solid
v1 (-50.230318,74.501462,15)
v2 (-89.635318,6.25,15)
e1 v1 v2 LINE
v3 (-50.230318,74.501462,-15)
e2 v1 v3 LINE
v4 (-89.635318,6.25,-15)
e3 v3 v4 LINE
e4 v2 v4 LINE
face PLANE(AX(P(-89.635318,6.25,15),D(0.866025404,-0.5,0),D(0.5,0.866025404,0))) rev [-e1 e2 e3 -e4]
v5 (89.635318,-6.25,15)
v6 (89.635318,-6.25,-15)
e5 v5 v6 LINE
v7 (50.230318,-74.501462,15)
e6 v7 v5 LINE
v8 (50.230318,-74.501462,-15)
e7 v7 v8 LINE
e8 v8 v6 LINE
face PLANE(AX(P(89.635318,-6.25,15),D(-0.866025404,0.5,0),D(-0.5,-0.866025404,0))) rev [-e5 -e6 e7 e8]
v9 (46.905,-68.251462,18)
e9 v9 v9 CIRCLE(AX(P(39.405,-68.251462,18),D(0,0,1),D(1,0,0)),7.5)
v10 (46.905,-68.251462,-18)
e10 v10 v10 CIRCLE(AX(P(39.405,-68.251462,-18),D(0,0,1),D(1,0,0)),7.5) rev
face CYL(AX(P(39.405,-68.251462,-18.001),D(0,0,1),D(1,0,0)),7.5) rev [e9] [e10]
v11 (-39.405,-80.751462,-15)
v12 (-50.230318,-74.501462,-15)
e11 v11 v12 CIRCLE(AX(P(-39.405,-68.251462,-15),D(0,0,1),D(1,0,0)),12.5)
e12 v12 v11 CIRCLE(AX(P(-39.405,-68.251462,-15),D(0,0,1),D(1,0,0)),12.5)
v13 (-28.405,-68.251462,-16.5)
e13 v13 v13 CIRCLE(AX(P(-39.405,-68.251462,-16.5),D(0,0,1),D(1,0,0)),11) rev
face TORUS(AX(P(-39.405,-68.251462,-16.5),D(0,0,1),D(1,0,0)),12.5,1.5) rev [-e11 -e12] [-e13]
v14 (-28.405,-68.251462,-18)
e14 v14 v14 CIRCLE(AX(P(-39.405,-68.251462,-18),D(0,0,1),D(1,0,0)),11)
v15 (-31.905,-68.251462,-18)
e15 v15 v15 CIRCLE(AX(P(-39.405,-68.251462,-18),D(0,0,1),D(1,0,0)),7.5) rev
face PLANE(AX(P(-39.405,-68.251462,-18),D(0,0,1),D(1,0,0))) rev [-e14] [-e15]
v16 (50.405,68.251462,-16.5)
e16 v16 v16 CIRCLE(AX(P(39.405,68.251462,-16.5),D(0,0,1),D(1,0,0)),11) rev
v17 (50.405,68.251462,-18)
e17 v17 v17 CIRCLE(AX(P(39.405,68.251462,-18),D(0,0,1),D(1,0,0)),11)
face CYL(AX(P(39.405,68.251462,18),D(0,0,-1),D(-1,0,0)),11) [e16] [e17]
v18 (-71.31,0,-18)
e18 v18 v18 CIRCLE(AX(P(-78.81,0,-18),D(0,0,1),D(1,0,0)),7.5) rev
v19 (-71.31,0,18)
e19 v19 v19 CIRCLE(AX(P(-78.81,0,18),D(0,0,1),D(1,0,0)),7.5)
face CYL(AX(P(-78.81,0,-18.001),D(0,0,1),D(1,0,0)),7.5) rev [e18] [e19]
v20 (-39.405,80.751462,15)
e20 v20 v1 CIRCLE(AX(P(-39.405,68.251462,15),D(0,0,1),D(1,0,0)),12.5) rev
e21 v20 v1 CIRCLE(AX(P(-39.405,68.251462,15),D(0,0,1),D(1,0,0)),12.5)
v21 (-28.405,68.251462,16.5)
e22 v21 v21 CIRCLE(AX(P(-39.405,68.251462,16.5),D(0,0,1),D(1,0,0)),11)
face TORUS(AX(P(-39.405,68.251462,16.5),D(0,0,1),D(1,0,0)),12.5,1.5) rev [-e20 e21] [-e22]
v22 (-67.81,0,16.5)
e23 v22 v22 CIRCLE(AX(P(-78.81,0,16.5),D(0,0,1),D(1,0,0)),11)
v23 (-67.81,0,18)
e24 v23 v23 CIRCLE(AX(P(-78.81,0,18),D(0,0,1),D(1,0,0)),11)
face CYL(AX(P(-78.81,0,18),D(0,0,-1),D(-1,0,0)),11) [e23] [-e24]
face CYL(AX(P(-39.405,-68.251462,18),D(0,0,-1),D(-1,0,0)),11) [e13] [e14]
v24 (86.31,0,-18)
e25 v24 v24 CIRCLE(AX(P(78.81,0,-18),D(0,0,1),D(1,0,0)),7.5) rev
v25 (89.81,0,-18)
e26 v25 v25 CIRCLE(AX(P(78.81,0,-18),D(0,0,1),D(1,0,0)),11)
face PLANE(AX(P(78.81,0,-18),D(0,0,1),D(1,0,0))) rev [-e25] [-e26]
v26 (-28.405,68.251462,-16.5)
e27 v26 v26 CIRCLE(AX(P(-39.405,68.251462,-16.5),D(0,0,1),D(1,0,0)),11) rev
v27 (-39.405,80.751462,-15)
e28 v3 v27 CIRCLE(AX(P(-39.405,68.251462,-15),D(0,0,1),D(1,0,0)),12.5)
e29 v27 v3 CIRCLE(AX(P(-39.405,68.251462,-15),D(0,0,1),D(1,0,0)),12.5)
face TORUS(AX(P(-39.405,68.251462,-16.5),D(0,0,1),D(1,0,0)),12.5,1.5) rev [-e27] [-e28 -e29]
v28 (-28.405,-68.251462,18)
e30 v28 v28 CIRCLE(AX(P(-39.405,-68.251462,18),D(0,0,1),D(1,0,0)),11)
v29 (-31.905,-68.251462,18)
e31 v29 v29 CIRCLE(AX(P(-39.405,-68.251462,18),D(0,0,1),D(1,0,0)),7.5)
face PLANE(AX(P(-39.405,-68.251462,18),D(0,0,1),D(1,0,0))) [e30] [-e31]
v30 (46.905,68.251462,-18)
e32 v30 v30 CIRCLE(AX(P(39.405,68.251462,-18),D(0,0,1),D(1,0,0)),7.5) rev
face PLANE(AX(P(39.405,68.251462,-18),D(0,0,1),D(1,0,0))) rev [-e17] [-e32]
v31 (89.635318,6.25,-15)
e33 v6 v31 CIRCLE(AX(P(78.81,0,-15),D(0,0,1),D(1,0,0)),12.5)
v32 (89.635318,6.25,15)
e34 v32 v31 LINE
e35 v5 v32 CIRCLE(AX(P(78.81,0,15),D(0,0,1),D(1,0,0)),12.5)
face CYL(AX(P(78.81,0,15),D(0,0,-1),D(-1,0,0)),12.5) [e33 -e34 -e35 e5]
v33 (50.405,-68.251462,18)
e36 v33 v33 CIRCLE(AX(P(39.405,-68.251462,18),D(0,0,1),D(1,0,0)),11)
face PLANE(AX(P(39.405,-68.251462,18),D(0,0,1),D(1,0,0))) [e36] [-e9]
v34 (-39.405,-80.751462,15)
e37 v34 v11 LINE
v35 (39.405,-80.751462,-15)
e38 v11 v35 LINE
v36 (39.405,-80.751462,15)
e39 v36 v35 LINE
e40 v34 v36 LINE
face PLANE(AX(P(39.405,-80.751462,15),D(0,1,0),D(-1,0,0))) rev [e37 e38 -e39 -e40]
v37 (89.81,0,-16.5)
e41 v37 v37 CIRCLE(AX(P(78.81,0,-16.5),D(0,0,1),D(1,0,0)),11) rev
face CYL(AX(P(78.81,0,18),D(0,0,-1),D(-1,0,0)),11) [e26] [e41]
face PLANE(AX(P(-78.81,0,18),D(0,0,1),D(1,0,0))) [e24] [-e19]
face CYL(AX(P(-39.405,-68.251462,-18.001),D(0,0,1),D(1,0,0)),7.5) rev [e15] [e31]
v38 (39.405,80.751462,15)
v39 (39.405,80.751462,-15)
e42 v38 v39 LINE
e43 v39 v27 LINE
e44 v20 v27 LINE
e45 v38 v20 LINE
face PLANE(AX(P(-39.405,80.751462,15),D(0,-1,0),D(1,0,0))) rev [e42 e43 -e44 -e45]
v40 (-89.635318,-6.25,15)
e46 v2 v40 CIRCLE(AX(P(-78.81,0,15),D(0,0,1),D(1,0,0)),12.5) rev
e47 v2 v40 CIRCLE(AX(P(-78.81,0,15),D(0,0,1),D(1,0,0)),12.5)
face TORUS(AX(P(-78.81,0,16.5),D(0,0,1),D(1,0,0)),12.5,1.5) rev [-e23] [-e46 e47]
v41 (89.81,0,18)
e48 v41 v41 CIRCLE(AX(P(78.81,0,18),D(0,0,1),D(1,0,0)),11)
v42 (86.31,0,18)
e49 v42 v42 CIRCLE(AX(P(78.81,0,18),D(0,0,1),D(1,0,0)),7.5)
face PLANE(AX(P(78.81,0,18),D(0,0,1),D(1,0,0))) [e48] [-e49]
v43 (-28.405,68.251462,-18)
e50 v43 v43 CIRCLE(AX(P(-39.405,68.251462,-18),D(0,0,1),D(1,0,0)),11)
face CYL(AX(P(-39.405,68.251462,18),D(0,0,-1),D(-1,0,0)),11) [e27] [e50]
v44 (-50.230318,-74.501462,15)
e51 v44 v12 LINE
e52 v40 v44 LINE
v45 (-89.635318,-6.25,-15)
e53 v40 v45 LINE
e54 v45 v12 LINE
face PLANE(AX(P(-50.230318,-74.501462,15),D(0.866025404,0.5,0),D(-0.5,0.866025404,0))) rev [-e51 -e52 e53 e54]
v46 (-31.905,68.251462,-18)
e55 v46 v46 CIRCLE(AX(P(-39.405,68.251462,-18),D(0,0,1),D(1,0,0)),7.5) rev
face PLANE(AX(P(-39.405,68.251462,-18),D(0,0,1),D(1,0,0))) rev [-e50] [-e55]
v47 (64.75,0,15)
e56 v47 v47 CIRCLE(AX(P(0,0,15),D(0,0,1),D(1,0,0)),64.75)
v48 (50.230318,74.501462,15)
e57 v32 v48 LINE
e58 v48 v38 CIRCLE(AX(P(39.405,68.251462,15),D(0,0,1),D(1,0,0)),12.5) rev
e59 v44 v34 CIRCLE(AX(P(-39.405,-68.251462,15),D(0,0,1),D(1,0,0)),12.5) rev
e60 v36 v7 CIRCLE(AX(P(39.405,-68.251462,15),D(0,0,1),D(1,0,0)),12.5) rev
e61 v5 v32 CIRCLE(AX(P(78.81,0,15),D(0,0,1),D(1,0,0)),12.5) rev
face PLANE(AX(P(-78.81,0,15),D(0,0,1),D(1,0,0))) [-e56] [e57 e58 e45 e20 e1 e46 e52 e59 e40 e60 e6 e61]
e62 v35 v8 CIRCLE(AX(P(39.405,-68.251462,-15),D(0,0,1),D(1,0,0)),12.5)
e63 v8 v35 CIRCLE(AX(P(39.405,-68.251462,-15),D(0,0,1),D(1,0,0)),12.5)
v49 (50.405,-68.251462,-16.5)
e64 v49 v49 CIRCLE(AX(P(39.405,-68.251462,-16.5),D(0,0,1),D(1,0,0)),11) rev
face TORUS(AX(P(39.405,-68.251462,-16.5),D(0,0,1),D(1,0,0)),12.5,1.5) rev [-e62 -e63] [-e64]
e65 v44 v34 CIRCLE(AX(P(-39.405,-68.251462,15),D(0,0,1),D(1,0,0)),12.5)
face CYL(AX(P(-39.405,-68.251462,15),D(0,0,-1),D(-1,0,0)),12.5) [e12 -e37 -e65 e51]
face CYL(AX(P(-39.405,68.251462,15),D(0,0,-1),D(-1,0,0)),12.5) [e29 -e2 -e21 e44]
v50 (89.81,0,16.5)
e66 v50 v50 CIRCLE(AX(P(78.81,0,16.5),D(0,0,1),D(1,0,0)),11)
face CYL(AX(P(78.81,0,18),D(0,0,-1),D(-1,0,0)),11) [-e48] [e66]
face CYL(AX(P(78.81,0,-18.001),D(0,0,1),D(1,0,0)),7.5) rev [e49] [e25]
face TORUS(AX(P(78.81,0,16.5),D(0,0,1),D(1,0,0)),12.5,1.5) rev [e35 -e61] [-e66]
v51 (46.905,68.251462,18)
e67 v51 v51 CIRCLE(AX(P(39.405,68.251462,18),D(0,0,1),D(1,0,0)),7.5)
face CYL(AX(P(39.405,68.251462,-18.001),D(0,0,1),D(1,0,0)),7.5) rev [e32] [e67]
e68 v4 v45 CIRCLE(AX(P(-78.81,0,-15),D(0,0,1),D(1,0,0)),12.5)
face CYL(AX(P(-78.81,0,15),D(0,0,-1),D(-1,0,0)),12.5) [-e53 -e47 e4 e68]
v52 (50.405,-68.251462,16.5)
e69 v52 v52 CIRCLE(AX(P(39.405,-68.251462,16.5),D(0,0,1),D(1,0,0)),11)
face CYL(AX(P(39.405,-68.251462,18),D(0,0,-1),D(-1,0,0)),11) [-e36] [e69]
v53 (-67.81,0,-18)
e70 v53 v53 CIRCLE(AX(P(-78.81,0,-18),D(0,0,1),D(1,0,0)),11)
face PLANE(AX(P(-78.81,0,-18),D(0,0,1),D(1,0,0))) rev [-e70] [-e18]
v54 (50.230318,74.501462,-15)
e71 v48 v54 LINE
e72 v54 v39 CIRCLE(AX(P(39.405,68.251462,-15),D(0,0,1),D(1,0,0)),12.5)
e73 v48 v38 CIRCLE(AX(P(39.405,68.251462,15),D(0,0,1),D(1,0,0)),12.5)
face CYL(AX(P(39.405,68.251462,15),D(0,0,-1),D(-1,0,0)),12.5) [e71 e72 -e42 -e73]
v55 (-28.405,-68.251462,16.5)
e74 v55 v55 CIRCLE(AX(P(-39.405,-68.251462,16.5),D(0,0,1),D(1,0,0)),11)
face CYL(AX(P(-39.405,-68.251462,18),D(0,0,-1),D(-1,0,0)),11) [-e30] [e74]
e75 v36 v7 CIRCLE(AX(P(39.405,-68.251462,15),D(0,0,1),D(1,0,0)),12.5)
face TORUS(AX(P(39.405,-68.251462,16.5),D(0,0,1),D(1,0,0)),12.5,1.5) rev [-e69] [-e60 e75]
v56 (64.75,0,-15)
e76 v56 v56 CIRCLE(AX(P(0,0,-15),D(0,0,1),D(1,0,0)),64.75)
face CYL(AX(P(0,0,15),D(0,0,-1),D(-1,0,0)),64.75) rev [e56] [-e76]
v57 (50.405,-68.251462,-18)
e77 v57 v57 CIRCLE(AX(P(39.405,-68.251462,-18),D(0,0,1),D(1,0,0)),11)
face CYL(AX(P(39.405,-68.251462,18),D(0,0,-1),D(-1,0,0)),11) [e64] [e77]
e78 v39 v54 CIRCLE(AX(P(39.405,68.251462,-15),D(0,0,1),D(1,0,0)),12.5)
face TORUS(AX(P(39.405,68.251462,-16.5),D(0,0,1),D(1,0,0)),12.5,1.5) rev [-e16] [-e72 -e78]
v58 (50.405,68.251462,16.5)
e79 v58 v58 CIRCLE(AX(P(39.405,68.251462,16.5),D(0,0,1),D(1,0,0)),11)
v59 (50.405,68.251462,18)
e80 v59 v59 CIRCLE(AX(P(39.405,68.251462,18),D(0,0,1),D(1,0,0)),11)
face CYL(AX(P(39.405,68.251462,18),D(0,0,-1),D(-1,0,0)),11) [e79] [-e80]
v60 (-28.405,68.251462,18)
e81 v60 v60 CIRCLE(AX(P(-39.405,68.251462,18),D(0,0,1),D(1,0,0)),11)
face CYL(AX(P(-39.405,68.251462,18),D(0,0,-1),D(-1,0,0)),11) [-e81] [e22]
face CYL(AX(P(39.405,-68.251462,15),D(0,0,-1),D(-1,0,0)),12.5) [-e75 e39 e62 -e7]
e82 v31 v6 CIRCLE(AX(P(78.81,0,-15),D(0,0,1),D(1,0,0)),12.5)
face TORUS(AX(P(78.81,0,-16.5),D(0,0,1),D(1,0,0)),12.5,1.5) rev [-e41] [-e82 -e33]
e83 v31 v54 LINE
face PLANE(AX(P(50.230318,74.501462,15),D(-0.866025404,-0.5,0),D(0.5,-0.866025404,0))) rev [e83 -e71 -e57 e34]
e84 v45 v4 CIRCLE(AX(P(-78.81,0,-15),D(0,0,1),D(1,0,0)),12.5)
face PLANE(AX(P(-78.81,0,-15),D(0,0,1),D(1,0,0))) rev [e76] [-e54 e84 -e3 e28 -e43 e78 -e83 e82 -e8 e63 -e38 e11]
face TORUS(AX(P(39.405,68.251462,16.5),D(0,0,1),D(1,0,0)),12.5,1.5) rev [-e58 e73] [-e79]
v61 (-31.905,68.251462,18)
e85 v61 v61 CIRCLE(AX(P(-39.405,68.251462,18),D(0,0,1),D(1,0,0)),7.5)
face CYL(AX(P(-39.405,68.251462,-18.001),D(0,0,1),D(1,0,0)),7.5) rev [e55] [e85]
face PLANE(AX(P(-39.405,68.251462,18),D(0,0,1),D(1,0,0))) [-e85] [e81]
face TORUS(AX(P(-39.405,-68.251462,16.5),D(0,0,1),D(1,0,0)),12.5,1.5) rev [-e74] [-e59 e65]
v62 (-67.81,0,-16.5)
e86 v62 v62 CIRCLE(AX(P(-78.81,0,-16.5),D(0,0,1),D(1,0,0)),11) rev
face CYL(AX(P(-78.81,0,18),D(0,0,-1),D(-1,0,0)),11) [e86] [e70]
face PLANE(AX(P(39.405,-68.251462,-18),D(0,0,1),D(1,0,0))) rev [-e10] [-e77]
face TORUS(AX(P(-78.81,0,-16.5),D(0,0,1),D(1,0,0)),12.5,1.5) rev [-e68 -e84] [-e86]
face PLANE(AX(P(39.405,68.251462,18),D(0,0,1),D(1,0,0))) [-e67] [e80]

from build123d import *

# Parameters (mm, degrees)
SKETCH1_R           = 64.75
BOSS_EXTRUDE1_DEPTH = 15
SKETCH2_R           = 11
BOSS_EXTRUDE2_DEPTH = 18
CUT_EXTRUDE1_REACH  = 129.1
SKETCH4_R           = 7.5
FILLET1_R           = 1.5


with BuildPart() as part:
    # Sketch1 → Boss-Extrude1 (new, symmetric)
    with BuildSketch(Plane.XY):
        with BuildLine():
            Line((-89.635317547, 6.25), (-50.230317547, 74.501462072))
            ThreePointArc((-50.230317547, 74.501462072), (-45.655, 79.07677962), (-39.405, 80.751462072))
            Line((-39.405, 80.751462072), (39.405, 80.751462072))
            ThreePointArc((39.405, 80.751462072), (45.655, 79.07677962), (50.230317547, 74.501462072))
            Line((50.230317547, 74.501462072), (89.635317547, 6.25))
            ThreePointArc((89.635317547, 6.25), (91.31, 0), (89.635317547, -6.25))
            Line((89.635317547, -6.25), (50.230317547, -74.501462072))
            ThreePointArc((50.230317547, -74.501462072), (45.655, -79.07677962), (39.405, -80.751462072))
            Line((39.405, -80.751462072), (-39.405, -80.751462072))
            ThreePointArc((-39.405, -80.751462072), (-45.655, -79.07677962), (-50.230317547, -74.501462072))
            Line((-50.230317547, -74.501462072), (-89.635317547, -6.25))
            ThreePointArc((-89.635317547, -6.25), (-91.31, 0), (-89.635317547, 6.25))
        make_face()
        Circle(SKETCH1_R, mode=Mode.SUBTRACT)
    extrude(amount=BOSS_EXTRUDE1_DEPTH, both=True)

    # Sketch2 → Boss-Extrude2 (add, symmetric)
    with BuildSketch(Plane.XY):
        with Locations((-78.81, 0)):
            Circle(SKETCH2_R)
        with Locations((-39.405, 68.251462072)):
            Circle(SKETCH2_R)
        with Locations((39.405, 68.251462072)):
            Circle(SKETCH2_R)
        with Locations((78.81, 0)):
            Circle(SKETCH2_R)
        with Locations((39.405, -68.251462072)):
            Circle(SKETCH2_R)
        with Locations((-39.405, -68.251462072)):
            Circle(SKETCH2_R)
    extrude(amount=BOSS_EXTRUDE2_DEPTH, both=True)

    # Sketch4 → Cut-Extrude1 (cut, up to next)
    with BuildSketch(Plane.XY.offset(18), mode=Mode.PRIVATE) as cut_extrude1_sk1:
        with Locations((-78.81, 0)):
            Circle(SKETCH4_R)
    cut_extrude1_tool1 = extrude(cut_extrude1_sk1.sketch, amount=-CUT_EXTRUDE1_REACH, mode=Mode.PRIVATE) & part.part
    # Sketch4 → Cut-Extrude1 (cut, up to next)
    with BuildSketch(Plane.XY.offset(18), mode=Mode.PRIVATE) as cut_extrude1_sk2:
        with Locations((-39.405, 68.251462072)):
            Circle(SKETCH4_R)
    cut_extrude1_tool2 = extrude(cut_extrude1_sk2.sketch, amount=-CUT_EXTRUDE1_REACH, mode=Mode.PRIVATE) & part.part
    # Sketch4 → Cut-Extrude1 (cut, up to next)
    with BuildSketch(Plane.XY.offset(18), mode=Mode.PRIVATE) as cut_extrude1_sk3:
        with Locations((39.405, 68.251462072)):
            Circle(SKETCH4_R)
    cut_extrude1_tool3 = extrude(cut_extrude1_sk3.sketch, amount=-CUT_EXTRUDE1_REACH, mode=Mode.PRIVATE) & part.part
    # Sketch4 → Cut-Extrude1 (cut, up to next)
    with BuildSketch(Plane.XY.offset(18), mode=Mode.PRIVATE) as cut_extrude1_sk4:
        with Locations((78.81, 0)):
            Circle(SKETCH4_R)
    cut_extrude1_tool4 = extrude(cut_extrude1_sk4.sketch, amount=-CUT_EXTRUDE1_REACH, mode=Mode.PRIVATE) & part.part
    # Sketch4 → Cut-Extrude1 (cut, up to next)
    with BuildSketch(Plane.XY.offset(18), mode=Mode.PRIVATE) as cut_extrude1_sk5:
        with Locations((39.405, -68.251462072)):
            Circle(SKETCH4_R)
    cut_extrude1_tool5 = extrude(cut_extrude1_sk5.sketch, amount=-CUT_EXTRUDE1_REACH, mode=Mode.PRIVATE) & part.part
    # Sketch4 → Cut-Extrude1 (cut, up to next)
    with BuildSketch(Plane.XY.offset(18), mode=Mode.PRIVATE) as cut_extrude1_sk6:
        with Locations((-39.405, -68.251462072)):
            Circle(SKETCH4_R)
    cut_extrude1_tool6 = extrude(cut_extrude1_sk6.sketch, amount=-CUT_EXTRUDE1_REACH, mode=Mode.PRIVATE) & part.part
    add(cut_extrude1_tool1.solids().sort_by_distance((-78.81, 0, 18))[0], mode=Mode.SUBTRACT)
    add(cut_extrude1_tool2.solids().sort_by_distance((-39.405, 68.251462, 18))[0], mode=Mode.SUBTRACT)
    add(cut_extrude1_tool3.solids().sort_by_distance((39.405, 68.251462, 18))[0], mode=Mode.SUBTRACT)
    add(cut_extrude1_tool4.solids().sort_by_distance((78.81, 0, 18))[0], mode=Mode.SUBTRACT)
    add(cut_extrude1_tool5.solids().sort_by_distance((39.405, -68.251462, 18))[0], mode=Mode.SUBTRACT)
    add(cut_extrude1_tool6.solids().sort_by_distance((-39.405, -68.251462, 18))[0], mode=Mode.SUBTRACT)

    # Fillet1
    fillet1_edges = [part.edges().sort_by_distance(p)[0] for p in [
        (-89.81, 0, -15),
        (-89.81, 0, 15),
        (-50.405, 68.251462072, -15),
        (-50.405, 68.251462072, 15),
        (28.405, 68.251462072, -15),
        (28.405, 68.251462072, 15),
        (67.81, 0, -15),
        (67.81, 0, 15),
        (28.405, -68.251462072, -15),
        (28.405, -68.251462072, 15),
        (-50.405, -68.251462072, -15),
        (-50.405, -68.251462072, 15),
    ]]
    fillet(fillet1_edges, radius=FILLET1_R - 0.0001)  # a hair under: the kernel refuses the full size


solid = part.part
